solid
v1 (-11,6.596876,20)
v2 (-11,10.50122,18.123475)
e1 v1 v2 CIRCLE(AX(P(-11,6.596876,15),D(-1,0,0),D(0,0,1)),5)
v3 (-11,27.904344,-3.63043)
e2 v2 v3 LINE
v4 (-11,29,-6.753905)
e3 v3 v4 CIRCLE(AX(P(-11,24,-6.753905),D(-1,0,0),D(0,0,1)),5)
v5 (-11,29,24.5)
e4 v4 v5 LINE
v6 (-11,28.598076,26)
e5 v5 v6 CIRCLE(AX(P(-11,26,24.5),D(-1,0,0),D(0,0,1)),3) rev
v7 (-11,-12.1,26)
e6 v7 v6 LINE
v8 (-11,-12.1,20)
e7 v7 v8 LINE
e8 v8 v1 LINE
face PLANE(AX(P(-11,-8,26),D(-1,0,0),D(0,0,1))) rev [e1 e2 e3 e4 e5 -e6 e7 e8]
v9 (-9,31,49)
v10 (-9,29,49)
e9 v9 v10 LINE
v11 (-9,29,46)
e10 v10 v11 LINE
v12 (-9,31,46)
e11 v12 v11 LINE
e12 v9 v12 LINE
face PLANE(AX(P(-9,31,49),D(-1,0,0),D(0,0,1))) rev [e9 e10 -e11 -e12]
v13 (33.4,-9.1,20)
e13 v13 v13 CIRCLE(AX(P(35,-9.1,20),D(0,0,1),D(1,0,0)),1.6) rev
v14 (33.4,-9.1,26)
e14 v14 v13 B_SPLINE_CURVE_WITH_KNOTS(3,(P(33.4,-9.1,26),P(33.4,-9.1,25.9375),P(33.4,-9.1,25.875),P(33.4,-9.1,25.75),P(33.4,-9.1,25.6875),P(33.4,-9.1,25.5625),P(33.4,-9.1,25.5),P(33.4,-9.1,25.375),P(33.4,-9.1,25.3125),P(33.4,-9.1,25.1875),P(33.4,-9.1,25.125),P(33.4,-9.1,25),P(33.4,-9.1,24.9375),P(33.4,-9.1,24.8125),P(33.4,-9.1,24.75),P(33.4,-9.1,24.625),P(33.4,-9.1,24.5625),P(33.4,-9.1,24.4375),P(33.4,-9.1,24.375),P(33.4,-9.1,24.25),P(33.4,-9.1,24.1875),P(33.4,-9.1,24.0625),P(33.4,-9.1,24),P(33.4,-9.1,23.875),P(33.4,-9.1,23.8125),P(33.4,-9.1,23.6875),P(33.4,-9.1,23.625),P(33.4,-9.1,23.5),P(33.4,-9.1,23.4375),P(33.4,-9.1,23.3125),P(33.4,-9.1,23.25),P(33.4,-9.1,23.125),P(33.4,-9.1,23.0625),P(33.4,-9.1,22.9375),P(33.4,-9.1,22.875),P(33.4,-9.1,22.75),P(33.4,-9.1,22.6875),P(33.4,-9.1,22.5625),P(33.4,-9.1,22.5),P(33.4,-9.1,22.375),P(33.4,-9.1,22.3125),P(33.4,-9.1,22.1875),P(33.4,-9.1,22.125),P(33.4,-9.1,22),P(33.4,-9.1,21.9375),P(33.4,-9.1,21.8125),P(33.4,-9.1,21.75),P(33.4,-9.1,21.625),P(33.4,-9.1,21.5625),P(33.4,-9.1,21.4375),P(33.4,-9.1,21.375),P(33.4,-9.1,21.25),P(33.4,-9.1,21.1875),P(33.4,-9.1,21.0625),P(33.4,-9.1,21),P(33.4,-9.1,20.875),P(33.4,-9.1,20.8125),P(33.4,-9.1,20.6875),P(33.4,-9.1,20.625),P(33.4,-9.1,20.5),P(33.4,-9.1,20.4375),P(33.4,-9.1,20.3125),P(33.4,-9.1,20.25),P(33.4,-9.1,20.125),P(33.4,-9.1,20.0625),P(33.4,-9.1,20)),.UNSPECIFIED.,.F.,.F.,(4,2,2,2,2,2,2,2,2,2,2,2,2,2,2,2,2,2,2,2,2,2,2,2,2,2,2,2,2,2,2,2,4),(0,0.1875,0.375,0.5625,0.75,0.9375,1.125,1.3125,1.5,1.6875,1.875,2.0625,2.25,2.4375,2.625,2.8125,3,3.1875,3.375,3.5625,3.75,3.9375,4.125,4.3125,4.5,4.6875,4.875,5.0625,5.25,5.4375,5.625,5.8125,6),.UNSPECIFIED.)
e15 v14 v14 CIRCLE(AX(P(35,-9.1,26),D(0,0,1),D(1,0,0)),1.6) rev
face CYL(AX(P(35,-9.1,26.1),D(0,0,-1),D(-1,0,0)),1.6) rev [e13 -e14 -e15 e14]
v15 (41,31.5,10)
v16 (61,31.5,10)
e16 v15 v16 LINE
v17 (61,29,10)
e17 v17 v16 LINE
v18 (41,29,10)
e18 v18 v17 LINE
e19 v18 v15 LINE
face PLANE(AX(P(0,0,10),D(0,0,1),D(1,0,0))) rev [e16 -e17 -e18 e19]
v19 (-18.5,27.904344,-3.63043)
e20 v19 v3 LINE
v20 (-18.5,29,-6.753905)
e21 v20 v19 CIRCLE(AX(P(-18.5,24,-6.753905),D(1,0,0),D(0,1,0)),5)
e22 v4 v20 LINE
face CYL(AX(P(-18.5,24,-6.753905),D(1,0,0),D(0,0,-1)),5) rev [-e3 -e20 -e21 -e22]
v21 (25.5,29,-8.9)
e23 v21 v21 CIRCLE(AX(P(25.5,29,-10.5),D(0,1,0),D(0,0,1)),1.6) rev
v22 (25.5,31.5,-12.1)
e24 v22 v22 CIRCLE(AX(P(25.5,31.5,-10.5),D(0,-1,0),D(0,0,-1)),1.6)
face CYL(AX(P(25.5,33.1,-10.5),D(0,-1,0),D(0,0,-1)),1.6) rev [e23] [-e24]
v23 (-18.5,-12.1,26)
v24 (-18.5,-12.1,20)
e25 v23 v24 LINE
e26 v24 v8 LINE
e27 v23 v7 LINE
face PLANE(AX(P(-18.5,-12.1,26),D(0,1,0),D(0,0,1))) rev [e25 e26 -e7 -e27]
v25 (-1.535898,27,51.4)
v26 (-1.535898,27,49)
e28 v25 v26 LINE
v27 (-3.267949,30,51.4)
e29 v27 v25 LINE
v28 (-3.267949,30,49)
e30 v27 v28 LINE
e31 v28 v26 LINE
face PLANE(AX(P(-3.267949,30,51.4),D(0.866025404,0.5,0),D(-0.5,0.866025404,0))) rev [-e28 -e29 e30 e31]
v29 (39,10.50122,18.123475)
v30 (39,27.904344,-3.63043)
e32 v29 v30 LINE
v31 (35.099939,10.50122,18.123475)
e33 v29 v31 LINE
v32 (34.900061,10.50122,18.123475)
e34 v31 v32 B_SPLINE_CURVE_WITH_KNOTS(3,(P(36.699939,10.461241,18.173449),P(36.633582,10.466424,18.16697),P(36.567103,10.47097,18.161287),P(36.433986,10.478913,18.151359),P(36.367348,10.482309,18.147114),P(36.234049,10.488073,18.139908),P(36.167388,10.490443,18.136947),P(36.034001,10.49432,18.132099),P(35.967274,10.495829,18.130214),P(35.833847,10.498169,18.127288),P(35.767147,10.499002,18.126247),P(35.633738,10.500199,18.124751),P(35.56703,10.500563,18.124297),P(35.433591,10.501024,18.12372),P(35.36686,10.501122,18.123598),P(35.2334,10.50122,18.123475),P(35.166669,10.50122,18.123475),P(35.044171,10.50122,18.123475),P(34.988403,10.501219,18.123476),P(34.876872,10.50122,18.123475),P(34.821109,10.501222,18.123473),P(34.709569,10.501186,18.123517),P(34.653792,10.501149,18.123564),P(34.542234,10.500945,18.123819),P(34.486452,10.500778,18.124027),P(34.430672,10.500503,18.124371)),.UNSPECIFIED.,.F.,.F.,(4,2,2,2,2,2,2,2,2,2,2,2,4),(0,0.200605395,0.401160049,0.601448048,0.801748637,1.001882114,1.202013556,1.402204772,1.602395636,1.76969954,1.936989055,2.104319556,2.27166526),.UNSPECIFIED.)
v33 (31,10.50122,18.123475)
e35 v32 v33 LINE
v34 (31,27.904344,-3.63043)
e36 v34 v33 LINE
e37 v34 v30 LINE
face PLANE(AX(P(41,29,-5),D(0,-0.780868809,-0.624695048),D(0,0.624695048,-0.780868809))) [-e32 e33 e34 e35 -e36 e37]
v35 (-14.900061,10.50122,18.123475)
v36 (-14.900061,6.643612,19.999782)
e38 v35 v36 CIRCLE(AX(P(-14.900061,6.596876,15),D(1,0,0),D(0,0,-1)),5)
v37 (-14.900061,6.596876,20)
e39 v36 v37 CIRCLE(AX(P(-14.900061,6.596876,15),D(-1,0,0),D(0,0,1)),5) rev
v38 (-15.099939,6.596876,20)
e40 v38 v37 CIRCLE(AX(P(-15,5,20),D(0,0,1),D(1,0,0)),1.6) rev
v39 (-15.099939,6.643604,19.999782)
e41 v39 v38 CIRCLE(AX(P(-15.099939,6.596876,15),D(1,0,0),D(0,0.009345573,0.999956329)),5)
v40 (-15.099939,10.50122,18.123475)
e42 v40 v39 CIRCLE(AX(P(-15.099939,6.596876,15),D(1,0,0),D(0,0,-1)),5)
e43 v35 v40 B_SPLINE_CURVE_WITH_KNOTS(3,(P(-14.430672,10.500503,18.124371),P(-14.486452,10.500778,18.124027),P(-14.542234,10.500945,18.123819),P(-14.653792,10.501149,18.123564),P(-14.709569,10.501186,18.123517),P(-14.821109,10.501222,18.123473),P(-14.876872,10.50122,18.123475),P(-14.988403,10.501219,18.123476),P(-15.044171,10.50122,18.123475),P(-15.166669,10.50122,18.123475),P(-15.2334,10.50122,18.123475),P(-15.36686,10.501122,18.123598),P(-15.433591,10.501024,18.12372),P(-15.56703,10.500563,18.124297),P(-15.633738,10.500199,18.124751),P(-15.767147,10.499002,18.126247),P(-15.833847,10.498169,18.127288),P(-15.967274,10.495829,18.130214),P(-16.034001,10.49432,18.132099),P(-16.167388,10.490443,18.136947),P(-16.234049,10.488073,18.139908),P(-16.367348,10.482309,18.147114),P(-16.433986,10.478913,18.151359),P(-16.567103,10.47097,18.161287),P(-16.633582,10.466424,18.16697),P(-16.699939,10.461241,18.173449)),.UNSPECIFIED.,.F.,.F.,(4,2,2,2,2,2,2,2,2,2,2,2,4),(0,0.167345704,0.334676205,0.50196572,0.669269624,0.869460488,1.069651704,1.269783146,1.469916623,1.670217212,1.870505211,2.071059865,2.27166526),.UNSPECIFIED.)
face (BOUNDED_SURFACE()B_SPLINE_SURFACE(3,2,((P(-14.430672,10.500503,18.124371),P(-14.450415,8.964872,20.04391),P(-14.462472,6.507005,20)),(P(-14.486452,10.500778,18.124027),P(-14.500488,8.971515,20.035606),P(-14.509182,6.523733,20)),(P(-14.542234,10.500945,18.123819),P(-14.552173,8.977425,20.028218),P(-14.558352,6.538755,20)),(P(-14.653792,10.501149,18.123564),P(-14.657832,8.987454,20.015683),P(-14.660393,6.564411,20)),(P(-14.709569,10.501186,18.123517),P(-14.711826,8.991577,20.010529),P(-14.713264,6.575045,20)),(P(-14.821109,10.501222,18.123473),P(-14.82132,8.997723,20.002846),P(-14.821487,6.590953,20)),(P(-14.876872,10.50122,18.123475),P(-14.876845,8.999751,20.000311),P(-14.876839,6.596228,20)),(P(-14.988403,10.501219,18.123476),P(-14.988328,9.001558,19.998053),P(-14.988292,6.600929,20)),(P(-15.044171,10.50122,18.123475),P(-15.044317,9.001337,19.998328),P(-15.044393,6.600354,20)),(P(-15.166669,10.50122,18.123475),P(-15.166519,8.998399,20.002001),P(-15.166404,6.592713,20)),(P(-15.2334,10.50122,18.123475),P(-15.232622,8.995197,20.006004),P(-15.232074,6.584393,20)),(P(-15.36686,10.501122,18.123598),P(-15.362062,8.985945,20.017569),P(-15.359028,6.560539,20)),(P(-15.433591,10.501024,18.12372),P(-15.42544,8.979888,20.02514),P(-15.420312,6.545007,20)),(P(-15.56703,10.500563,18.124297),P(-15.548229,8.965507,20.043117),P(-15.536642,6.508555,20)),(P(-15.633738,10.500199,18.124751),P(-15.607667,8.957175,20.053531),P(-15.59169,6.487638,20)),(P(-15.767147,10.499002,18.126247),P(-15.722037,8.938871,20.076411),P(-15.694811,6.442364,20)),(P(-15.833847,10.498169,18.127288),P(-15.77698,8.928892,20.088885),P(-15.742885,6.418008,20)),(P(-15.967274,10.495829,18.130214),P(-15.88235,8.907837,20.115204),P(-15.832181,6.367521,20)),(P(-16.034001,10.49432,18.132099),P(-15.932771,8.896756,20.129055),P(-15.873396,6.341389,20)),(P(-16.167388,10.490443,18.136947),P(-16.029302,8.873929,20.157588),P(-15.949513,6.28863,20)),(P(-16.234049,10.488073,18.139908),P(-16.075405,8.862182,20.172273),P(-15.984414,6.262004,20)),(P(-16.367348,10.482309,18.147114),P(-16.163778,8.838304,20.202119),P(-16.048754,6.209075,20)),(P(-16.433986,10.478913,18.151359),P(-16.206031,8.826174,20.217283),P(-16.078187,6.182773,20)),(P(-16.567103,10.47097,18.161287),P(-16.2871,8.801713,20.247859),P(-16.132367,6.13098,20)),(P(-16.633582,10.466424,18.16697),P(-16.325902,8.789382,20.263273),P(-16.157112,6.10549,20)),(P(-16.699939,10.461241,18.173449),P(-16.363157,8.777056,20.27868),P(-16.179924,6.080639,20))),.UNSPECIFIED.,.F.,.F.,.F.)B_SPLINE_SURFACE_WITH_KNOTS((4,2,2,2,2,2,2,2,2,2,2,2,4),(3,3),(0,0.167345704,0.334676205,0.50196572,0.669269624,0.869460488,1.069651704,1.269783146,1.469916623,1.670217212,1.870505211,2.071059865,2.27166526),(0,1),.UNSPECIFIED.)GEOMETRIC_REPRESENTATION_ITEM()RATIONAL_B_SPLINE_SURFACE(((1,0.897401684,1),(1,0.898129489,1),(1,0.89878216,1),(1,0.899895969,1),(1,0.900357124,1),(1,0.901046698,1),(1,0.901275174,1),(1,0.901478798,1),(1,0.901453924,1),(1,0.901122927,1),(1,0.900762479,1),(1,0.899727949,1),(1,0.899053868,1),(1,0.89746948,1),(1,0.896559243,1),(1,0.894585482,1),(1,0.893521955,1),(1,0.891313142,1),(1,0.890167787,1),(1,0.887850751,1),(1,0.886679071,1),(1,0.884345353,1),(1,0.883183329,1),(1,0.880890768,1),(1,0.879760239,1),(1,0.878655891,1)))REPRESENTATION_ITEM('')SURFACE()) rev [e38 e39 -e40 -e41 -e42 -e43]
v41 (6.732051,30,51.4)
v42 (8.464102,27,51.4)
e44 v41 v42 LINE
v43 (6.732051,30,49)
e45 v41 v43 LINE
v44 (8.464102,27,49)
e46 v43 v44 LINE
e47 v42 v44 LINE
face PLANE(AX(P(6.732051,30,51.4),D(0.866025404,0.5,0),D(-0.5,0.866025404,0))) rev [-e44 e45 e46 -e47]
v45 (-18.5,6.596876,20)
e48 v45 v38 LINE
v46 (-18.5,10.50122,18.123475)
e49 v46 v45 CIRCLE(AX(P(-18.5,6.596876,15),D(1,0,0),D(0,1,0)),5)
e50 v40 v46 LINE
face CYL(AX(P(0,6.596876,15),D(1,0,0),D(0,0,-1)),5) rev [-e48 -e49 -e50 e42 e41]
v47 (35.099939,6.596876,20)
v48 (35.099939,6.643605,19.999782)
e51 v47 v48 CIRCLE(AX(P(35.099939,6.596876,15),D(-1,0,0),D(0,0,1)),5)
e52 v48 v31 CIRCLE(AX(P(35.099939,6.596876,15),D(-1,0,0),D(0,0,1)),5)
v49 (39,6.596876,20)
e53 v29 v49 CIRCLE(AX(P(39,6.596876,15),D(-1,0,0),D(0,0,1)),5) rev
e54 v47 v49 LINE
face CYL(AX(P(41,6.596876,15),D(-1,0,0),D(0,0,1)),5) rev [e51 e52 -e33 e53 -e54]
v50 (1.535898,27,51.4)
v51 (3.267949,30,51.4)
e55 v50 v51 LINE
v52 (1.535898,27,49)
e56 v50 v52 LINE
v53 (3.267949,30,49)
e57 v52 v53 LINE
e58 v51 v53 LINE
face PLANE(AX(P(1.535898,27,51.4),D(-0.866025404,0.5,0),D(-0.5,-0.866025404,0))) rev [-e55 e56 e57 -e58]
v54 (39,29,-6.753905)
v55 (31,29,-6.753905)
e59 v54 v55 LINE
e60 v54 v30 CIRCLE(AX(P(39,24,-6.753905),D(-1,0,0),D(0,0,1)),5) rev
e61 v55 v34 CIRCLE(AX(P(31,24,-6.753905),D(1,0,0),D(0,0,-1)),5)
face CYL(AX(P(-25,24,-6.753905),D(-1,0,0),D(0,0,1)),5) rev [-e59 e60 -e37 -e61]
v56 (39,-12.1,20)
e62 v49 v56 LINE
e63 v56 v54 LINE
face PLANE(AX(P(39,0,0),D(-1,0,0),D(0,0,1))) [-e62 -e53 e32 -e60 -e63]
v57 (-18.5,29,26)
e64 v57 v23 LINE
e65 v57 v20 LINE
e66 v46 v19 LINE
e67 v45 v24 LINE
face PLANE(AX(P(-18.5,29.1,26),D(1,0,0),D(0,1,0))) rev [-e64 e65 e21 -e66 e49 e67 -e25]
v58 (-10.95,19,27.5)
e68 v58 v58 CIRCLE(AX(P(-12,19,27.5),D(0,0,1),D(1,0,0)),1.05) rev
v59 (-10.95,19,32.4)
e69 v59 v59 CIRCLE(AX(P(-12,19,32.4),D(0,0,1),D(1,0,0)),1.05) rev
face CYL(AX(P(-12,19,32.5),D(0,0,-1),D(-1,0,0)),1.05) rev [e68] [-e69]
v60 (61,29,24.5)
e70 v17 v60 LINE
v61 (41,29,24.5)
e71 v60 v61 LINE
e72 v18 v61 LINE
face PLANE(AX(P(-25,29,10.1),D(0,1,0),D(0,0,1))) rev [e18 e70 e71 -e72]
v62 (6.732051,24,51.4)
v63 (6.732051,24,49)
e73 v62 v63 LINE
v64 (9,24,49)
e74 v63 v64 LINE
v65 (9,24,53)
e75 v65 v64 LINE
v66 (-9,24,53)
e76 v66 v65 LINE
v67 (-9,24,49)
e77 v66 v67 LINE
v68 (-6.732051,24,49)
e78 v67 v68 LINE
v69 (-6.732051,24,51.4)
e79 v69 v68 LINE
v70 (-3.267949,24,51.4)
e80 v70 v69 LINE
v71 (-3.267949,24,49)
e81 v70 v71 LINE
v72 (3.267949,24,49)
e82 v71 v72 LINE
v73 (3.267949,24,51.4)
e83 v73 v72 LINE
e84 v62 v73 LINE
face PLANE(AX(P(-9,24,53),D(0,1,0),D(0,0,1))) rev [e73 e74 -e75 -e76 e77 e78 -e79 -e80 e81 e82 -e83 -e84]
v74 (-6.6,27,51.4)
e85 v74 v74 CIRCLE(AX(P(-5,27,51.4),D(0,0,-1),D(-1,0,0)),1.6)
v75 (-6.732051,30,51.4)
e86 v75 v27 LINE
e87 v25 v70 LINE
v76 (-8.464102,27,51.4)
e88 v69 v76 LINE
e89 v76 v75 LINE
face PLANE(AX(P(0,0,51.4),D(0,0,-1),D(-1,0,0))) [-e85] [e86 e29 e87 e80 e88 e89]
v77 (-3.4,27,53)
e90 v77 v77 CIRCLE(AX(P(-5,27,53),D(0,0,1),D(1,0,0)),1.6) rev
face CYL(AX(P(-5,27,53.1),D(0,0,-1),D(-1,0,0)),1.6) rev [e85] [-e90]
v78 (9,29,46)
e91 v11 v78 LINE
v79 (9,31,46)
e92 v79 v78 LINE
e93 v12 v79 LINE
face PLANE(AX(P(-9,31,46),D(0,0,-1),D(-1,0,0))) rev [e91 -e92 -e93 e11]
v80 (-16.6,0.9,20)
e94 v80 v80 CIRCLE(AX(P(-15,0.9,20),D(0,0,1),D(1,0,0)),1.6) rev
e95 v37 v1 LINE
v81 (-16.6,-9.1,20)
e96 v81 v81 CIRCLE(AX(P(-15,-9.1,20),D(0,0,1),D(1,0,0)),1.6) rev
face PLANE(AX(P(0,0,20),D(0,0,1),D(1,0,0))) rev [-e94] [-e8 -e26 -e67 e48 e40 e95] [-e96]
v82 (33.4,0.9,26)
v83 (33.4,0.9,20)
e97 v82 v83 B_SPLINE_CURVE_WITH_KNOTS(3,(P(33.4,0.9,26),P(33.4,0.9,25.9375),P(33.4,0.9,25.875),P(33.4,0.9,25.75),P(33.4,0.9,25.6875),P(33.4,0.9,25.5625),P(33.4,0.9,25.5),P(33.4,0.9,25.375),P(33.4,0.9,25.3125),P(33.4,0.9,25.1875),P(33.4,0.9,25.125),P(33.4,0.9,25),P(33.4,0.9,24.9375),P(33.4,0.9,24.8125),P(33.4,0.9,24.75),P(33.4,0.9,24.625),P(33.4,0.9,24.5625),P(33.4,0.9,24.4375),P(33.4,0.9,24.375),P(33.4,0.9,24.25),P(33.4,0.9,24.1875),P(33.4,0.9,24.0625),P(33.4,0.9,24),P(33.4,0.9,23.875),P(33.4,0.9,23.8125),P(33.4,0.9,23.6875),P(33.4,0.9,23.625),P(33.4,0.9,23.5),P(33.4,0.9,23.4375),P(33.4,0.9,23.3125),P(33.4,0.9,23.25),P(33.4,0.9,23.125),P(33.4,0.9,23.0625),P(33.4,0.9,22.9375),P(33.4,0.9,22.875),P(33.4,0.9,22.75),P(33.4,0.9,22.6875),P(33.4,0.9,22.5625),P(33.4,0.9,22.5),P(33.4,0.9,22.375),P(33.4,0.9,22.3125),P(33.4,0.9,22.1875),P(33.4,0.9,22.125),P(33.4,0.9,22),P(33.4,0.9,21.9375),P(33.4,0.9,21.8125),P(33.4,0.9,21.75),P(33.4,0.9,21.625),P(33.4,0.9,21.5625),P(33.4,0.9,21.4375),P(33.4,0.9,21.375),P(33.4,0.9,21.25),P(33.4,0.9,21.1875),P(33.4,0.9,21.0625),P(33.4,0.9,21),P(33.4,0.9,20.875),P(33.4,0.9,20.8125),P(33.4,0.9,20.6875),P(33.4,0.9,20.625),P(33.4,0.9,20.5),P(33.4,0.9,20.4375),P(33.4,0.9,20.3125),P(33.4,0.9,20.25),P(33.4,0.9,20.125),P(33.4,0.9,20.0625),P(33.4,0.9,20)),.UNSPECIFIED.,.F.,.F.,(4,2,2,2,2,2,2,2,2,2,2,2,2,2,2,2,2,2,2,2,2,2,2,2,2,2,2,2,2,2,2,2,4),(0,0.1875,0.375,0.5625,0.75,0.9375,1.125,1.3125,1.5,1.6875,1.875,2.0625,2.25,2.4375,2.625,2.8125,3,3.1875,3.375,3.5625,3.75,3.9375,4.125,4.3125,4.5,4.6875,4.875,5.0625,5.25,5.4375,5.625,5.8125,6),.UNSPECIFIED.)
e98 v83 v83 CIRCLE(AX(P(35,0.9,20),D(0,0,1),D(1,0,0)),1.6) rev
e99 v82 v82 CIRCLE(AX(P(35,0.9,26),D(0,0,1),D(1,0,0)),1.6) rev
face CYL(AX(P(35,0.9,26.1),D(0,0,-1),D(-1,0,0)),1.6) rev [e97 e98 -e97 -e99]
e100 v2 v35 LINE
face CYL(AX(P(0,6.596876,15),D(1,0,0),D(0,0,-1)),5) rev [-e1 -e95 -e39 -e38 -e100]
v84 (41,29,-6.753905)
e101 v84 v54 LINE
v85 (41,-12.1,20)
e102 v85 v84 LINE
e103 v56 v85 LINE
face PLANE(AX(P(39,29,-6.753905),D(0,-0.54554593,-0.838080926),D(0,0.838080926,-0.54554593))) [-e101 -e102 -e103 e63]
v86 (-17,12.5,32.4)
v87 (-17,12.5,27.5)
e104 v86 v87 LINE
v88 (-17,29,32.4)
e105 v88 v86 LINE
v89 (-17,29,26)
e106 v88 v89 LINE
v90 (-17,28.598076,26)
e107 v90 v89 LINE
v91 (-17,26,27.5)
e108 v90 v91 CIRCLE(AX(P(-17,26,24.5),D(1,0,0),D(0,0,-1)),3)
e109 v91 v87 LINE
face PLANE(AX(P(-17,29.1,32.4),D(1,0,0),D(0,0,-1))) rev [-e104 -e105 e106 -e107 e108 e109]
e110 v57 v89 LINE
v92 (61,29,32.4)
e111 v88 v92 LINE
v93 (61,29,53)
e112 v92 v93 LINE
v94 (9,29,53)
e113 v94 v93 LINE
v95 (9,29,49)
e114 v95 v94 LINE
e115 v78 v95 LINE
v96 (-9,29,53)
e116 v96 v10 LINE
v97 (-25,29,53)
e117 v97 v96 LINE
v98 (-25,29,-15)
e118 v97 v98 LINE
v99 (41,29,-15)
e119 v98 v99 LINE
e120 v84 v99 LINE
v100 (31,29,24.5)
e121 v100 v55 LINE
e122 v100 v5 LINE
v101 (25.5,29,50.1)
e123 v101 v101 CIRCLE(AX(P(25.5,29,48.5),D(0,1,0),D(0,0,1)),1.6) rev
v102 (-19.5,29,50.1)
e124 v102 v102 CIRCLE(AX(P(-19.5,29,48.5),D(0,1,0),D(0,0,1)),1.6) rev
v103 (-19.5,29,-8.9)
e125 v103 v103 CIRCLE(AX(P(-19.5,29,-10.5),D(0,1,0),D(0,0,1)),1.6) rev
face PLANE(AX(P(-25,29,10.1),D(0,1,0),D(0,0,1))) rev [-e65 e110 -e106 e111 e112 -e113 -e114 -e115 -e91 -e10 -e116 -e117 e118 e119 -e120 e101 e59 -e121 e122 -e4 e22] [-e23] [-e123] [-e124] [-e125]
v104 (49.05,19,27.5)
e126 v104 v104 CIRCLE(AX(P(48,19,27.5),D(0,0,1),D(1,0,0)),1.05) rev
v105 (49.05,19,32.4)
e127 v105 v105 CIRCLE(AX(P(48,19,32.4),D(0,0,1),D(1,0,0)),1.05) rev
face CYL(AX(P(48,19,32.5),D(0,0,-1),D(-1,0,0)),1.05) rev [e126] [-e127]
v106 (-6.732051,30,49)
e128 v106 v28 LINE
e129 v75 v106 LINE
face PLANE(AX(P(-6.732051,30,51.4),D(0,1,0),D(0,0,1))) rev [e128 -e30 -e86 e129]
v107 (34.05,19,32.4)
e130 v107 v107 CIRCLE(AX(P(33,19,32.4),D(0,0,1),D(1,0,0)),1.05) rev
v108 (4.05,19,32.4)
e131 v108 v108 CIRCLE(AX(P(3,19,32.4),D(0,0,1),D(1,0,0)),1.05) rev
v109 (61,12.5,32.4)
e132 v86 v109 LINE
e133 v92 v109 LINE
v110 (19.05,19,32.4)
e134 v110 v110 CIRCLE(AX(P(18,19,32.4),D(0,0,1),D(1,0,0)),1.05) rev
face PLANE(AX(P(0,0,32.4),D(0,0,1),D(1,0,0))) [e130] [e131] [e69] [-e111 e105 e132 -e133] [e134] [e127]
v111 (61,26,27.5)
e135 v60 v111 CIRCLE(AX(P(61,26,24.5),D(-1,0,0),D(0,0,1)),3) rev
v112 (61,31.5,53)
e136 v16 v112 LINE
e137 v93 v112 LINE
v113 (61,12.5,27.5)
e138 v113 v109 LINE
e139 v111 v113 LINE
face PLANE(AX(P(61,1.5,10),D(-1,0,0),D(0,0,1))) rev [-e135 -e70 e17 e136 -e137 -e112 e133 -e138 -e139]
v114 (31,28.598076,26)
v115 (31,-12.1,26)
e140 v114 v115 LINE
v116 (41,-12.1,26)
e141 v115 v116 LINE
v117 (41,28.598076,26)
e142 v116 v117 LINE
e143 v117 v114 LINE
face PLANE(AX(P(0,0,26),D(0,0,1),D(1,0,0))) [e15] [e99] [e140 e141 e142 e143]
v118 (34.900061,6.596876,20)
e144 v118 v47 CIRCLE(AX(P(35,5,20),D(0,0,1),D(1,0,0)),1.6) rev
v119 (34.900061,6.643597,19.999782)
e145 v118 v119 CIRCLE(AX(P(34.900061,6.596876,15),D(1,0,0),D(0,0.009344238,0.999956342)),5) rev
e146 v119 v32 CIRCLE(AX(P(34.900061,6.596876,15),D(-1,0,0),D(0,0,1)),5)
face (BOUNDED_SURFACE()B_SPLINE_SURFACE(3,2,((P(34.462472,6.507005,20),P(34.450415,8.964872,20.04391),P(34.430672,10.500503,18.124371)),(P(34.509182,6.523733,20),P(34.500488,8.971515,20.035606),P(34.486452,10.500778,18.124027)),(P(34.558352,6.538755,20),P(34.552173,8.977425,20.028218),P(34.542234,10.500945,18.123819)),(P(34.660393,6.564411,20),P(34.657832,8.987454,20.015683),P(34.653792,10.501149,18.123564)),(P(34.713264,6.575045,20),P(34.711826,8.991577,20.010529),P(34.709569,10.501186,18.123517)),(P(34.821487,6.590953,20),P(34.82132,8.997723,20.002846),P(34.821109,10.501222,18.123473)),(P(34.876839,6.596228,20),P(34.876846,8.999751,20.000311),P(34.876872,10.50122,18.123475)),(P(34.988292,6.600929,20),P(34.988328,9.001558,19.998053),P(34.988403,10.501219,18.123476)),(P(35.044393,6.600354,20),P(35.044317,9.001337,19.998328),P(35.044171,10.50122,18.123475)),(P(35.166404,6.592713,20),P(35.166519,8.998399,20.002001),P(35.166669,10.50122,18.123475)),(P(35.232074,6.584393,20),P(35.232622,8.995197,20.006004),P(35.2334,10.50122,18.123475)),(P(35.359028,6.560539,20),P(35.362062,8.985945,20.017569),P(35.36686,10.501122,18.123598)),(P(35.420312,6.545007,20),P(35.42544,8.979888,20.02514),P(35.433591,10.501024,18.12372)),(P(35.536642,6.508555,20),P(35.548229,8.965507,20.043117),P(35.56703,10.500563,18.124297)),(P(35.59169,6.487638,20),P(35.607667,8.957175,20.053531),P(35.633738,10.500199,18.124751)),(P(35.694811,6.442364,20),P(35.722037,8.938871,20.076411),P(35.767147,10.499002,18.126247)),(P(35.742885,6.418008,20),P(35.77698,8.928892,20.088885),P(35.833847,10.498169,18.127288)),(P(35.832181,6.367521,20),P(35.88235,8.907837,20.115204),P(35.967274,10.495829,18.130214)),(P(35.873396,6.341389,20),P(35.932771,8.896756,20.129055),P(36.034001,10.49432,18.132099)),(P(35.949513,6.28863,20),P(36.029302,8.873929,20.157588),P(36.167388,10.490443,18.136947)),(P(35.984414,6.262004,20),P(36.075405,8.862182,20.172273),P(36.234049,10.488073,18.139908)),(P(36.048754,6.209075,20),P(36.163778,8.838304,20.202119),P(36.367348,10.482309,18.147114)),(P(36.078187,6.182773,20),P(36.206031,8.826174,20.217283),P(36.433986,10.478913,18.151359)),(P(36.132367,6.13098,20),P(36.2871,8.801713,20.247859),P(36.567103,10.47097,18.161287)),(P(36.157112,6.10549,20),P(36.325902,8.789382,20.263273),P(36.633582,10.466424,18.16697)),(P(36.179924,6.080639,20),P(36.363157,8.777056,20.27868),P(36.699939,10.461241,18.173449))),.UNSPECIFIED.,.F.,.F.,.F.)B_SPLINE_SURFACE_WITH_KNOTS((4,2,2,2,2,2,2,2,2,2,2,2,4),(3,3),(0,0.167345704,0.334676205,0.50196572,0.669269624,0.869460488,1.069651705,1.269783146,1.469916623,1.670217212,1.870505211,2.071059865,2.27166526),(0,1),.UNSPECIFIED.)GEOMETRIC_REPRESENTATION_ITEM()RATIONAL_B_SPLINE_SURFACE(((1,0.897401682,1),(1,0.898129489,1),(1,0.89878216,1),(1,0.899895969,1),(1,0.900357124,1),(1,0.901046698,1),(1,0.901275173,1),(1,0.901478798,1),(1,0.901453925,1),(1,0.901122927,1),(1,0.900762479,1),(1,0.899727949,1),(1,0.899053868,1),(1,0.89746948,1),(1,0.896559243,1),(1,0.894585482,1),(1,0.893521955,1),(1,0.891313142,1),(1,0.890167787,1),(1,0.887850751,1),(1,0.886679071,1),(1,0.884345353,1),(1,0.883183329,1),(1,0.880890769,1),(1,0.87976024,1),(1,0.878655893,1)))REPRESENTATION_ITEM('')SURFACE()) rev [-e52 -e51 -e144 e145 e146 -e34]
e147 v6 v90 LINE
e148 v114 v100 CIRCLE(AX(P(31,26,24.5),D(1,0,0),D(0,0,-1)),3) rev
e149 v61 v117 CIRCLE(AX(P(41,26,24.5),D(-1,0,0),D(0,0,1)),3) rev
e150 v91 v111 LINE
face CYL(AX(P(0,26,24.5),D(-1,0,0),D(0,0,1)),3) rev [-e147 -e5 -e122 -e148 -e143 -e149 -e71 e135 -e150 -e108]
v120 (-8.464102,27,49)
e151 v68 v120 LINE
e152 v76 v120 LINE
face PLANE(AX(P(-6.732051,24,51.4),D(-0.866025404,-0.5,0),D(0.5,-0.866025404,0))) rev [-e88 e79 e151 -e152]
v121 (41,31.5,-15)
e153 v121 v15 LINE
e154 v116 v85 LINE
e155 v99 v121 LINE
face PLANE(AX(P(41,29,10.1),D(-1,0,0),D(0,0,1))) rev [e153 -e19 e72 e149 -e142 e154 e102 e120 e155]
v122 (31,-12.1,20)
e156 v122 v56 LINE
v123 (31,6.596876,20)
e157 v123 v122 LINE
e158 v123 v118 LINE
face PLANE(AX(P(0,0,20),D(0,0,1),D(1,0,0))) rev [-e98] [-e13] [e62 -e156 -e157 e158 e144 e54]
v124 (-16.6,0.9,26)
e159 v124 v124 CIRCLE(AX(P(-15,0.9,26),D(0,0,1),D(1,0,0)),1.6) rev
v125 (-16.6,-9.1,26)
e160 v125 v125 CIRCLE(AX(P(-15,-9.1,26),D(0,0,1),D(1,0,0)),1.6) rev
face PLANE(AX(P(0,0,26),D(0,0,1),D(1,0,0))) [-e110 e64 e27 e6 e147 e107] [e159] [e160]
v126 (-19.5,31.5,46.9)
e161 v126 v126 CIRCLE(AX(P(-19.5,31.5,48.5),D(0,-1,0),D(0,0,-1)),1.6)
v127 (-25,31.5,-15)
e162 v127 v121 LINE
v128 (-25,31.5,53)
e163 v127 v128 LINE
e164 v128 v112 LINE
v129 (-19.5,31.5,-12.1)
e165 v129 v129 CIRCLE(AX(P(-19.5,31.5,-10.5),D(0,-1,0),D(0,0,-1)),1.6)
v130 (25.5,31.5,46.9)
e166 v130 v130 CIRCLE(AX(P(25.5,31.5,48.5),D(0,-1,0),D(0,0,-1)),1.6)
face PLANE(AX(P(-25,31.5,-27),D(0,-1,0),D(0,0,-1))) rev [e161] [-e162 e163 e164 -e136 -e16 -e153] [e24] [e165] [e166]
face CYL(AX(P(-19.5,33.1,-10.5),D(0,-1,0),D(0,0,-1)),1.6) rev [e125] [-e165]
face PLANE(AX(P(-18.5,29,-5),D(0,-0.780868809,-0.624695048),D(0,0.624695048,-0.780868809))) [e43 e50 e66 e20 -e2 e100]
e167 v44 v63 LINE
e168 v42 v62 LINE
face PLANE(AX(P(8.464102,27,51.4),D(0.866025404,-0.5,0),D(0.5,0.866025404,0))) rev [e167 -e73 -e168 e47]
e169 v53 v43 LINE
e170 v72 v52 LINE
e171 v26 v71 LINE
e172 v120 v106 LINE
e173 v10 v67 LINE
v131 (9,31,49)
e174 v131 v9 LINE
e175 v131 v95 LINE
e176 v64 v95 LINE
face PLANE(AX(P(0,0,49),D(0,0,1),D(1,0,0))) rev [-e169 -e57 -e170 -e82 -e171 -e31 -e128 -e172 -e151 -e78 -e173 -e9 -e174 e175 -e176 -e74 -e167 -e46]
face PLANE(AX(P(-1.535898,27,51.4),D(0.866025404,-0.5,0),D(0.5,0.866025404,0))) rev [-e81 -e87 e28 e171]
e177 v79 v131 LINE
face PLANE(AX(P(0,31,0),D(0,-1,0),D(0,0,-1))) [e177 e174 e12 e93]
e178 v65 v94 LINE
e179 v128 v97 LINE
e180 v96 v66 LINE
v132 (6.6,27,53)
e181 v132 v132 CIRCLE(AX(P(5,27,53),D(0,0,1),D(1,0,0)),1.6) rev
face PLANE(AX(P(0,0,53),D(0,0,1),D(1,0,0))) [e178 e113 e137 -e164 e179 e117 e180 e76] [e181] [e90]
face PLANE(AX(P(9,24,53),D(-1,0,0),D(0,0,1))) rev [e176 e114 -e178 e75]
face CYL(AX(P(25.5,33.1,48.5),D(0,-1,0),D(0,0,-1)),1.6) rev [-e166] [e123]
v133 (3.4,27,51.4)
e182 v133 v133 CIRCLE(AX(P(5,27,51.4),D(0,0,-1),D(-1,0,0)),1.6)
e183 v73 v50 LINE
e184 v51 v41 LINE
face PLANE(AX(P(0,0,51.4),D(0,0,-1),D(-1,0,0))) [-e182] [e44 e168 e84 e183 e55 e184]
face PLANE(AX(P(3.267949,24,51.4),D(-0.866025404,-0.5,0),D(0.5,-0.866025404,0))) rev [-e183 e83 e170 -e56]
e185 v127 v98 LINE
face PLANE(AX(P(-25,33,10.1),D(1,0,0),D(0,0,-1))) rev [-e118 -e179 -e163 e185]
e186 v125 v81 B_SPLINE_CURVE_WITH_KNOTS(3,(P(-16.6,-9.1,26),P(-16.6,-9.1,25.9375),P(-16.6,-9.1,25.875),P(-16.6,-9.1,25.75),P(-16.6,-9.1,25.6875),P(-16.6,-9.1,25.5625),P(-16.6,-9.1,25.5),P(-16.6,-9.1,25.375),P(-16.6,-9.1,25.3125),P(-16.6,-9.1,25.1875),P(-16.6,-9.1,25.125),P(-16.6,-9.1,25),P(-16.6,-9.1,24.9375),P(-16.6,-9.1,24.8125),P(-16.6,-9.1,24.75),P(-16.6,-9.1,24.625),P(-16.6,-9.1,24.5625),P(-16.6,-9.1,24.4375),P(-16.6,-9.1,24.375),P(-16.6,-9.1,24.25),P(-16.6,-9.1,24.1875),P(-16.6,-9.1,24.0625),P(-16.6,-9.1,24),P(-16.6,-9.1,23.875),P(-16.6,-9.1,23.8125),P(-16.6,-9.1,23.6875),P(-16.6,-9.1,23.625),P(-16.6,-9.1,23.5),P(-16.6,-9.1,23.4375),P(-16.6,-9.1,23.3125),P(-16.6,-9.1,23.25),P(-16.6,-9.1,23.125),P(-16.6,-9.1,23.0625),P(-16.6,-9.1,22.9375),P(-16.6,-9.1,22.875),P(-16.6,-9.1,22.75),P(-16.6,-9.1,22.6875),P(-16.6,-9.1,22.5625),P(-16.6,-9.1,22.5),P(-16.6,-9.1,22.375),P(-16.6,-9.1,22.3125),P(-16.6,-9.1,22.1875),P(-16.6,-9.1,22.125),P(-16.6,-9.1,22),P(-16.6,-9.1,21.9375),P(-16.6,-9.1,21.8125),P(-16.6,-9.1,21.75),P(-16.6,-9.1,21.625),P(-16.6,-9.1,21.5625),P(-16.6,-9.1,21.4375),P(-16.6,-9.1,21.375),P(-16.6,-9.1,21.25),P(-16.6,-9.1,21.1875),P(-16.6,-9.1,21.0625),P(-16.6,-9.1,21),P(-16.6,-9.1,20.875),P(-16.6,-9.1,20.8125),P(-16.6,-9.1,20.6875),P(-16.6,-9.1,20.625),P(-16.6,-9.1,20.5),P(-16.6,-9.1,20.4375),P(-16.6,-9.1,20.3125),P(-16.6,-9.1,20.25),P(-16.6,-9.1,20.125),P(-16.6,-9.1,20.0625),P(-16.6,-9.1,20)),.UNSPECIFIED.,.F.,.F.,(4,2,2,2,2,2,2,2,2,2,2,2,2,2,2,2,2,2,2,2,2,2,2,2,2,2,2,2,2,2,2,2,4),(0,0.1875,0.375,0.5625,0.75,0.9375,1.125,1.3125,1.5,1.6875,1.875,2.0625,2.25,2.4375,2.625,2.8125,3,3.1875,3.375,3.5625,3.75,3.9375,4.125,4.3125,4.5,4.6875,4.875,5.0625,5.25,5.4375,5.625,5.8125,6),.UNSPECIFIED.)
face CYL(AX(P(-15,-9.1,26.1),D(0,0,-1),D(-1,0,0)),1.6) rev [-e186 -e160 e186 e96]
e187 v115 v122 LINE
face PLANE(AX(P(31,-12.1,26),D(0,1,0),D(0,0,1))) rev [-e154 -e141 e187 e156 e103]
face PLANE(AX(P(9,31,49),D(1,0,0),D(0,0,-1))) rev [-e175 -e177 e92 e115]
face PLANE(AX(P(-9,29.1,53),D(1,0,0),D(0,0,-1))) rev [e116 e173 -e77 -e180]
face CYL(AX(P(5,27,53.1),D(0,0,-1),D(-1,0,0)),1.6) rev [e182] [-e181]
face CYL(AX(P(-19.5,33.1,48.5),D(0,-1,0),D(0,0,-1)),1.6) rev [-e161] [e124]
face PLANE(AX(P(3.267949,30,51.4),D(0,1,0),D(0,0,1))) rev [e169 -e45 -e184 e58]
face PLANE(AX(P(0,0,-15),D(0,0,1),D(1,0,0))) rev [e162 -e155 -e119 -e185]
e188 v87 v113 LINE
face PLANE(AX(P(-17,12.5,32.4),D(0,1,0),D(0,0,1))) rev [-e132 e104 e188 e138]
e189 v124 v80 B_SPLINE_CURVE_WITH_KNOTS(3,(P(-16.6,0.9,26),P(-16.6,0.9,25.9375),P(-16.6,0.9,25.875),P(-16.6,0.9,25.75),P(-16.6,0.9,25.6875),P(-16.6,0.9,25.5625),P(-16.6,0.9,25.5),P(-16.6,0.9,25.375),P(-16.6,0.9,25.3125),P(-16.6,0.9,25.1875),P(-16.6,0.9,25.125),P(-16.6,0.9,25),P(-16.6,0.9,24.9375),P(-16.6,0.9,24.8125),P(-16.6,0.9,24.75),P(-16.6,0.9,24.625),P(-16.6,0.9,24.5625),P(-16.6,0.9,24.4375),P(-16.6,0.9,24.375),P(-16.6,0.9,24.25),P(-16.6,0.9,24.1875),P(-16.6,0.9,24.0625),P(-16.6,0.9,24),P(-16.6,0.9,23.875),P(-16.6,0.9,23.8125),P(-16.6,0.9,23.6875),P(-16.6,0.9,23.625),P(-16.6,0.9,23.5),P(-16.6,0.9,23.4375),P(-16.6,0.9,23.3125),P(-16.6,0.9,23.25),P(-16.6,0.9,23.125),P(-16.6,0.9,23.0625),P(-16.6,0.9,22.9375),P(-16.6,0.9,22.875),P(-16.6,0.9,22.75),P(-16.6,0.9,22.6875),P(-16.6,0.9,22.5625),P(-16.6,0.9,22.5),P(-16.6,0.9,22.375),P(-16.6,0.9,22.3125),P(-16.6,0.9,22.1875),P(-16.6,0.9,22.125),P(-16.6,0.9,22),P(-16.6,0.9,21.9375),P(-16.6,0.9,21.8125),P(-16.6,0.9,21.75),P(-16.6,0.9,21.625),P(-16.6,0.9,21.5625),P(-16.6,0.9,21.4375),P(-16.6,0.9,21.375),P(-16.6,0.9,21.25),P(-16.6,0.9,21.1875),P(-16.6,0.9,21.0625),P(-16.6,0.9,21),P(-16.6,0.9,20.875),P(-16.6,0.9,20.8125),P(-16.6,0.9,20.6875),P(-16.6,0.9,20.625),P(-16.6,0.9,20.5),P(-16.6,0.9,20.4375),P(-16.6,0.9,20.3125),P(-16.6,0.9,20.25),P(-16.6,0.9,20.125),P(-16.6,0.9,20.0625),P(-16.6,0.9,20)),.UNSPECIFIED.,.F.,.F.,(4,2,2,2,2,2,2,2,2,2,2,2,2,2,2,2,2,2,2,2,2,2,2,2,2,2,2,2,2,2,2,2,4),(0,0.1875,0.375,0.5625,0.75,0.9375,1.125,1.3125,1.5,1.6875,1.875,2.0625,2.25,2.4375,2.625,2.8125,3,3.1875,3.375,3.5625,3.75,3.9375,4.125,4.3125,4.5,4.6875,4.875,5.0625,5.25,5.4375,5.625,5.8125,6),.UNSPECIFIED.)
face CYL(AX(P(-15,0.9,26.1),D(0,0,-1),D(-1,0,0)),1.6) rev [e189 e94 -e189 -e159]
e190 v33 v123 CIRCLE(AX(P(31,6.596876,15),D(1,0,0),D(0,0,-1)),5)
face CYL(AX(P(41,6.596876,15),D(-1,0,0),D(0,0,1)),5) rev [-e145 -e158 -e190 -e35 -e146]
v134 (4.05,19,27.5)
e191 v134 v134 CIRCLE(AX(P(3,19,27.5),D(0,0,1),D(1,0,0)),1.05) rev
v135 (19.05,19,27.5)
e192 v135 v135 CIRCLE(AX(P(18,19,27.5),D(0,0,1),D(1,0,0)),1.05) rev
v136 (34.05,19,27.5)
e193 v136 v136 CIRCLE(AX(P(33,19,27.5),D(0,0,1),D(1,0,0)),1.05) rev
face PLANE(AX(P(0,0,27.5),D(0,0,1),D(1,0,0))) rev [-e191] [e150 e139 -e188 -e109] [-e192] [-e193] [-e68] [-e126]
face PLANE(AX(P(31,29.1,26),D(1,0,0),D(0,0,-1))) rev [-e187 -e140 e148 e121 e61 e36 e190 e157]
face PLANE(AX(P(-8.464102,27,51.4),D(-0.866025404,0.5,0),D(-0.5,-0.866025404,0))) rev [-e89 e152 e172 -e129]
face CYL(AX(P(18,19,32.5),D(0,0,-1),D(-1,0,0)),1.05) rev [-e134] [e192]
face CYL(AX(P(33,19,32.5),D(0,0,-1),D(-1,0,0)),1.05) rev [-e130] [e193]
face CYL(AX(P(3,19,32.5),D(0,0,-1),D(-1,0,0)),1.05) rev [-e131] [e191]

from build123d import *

# Parameters (mm, degrees)
ORTHOGONAL_START                              = -15
ORTHOGONAL_CHASSIS_PLATE_PRIMARY_PROFILE_W    = 66
ORTHOGONAL_CHASSIS_PLATE_PRIMARY_PROFILE_H    = 4
ORTHOGONAL_CHASSIS_PLATE_PRIMARY_DEPTH        = 25.1
ORTHOGONAL_START_2                            = 10
ORTHOGONAL_CHASSIS_PLATE_GUIDE_SIDE_PROF_W    = 109
ORTHOGONAL_CHASSIS_PLATE_GUIDE_SIDE_PROF_H    = 4
ORTHOGONAL_CHASSIS_PLATE_GUIDE_SIDE_DEPTH     = 43
HORIZONTAL_START                              = 20
HORIZONTAL_SERVO_SEAT_UPRIGHTS_PROFILE_W      = 7.5
HORIZONTAL_SERVO_SEAT_UPRIGHTS_PROFILE_H      = 37.1
HORIZONTAL_SERVO_SEAT_UPRIGHTS_PROFILE_W_2    = 10
HORIZONTAL_SERVO_SEAT_UPRIGHTS_DEPTH          = 6
SIDE_START                                    = 27.5
SIDE_MOUNTING_FACE_FOR_MGN7_RAIL_PROFILE_W    = 100
SIDE_MOUNTING_FACE_FOR_MGN7_RAIL_PROFILE_H    = 16.6
SIDE_MOUNTING_FACE_FOR_MGN7_RAIL_DEPTH        = 4.9
HORIZONTAL_START_2                            = 49
HORIZONTAL_LIMIT_BRACKET_FOOT_SUPPORT_PR_W    = 18
HORIZONTAL_LIMIT_BRACKET_FOOT_SUPPORT_PR_H    = 5.1
HORIZONTAL_LIMIT_BRACKET_FOOT_SUPPORT_DEPTH   = 4
CHASSIS_START                                 = 28.9
CHASSIS_MOUNTING_HOLE_LAYOUT_45_X_41_2_R      = 1.6
CHASSIS_MOUNTING_HOLE_LAYOUT_45_X_41_MM_DEPTH = 4.2
SERVO_START                                   = 19.9
SERVO_MOUNT_50_X_10_MM_PITCH_PROFILE_R        = 1.6
SERVO_MOUNT_50_X_10_MM_PITCH_DEPTH            = 6.2
GUIDE_START                                   = 27.45
GUIDE_M2_MOUNTING_PILOTS_15_MM_PITCH_PRO_R    = 1.05
GUIDE_M2_MOUNTING_PILOTS_15_MM_PITCH_DEPTH    = 5.05
STOP_START                                    = 48.9
STOP_MOUNTING_TWO_M3_PILOTS_10_MM_PI_2_R      = 1.6
STOP_MOUNTING_TWO_M3_PILOTS_10_MM_PITCH_DEPTH = 4.2
FILLET_2_R                                    = 3
SKETCH_3_W                                    = 18
SKETCH_3_H                                    = 3
CUT_EXTRUDE_1_DEPTH                           = 2
CUT_EXTRUDE_2_DEPTH                           = 2.4
EXTRUDE_3_DEPTH                               = 7.5
EXTRUDE_4_DEPTH                               = 10
FILLET_3_R                                    = 5
SKETCH_7_W                                    = 109
SKETCH_7_H                                    = 1.5
CUT_EXTRUDE_3_DEPTH                           = 80
SKETCH_8_W                                    = 23
SKETCH_8_H                                    = 43
CUT_EXTRUDE_4_DEPTH                           = 30
RAISE_START                                   = 20
RAISE_SERVO_MOUNTING_TABS_BY_4_10_MM_PRO_W    = 7.5
RAISE_SERVO_MOUNTING_TABS_BY_4_10_MM_PRO_H    = 5.1
RAISE_SERVO_MOUNTING_TABS_BY_4_10_MM_PRO_W_2  = 10
RAISE_SERVO_MOUNTING_TABS_BY_4_10_MM_DEPTH    = 6
FILL_START                                    = 20
FILL_ORIGINAL_SERVO_HOLES_PROFILE_R           = 1.65
FILL_ORIGINAL_SERVO_HOLES_DEPTH               = 6
SERVO_MOUNTING_HOLES_RAISED_4_10_MM_PROF_R    = 1.6
SERVO_MOUNTING_HOLES_RAISED_4_10_MM_DEPTH     = 6.2
EXTRUDE_5_DEPTH                               = 2


with BuildPart() as part:
    # Orthogonal chassis plate primary profile → Orthogonal chassis plate primary (new body)
    with BuildSketch(Plane.XY.offset(ORTHOGONAL_START)):
        with Locations((8, 31)):
            Rectangle(ORTHOGONAL_CHASSIS_PLATE_PRIMARY_PROFILE_W, ORTHOGONAL_CHASSIS_PLATE_PRIMARY_PROFILE_H)
    extrude(amount=ORTHOGONAL_CHASSIS_PLATE_PRIMARY_DEPTH)

    # Orthogonal chassis plate guide side profile → Orthogonal chassis plate guide side (add)
    with BuildSketch(Plane.XY.offset(ORTHOGONAL_START_2)):
        with Locations((29.5, 31)):
            Rectangle(ORTHOGONAL_CHASSIS_PLATE_GUIDE_SIDE_PROF_W, ORTHOGONAL_CHASSIS_PLATE_GUIDE_SIDE_PROF_H)
    extrude(amount=ORTHOGONAL_CHASSIS_PLATE_GUIDE_SIDE_DEPTH)

    # Horizontal servo seat uprights profile → Horizontal servo seat uprights (add)
    with BuildSketch(Plane.XY.offset(HORIZONTAL_START)):
        with Locations((-14.75, 10.55)):
            Rectangle(HORIZONTAL_SERVO_SEAT_UPRIGHTS_PROFILE_W, HORIZONTAL_SERVO_SEAT_UPRIGHTS_PROFILE_H)
        with Locations((36, 10.55)):
            Rectangle(HORIZONTAL_SERVO_SEAT_UPRIGHTS_PROFILE_W_2, HORIZONTAL_SERVO_SEAT_UPRIGHTS_PROFILE_H)
    extrude(amount=HORIZONTAL_SERVO_SEAT_UPRIGHTS_DEPTH)

    # Side mounting face for MGN7 rail profile → Side mounting face for MGN7 rail (add)
    with BuildSketch(Plane.XY.offset(SIDE_START)):
        with Locations((33, 20.8)):
            Rectangle(SIDE_MOUNTING_FACE_FOR_MGN7_RAIL_PROFILE_W, SIDE_MOUNTING_FACE_FOR_MGN7_RAIL_PROFILE_H)
    extrude(amount=SIDE_MOUNTING_FACE_FOR_MGN7_RAIL_DEPTH)

    # Horizontal limit bracket foot support profile → Horizontal limit bracket foot support (add)
    with BuildSketch(Plane.XY.offset(HORIZONTAL_START_2)):
        with Locations((0, 26.55)):
            Rectangle(HORIZONTAL_LIMIT_BRACKET_FOOT_SUPPORT_PR_W, HORIZONTAL_LIMIT_BRACKET_FOOT_SUPPORT_PR_H)
    extrude(amount=HORIZONTAL_LIMIT_BRACKET_FOOT_SUPPORT_DEPTH)

    # Chassis mounting hole layout 45 x 41 2 → Chassis mounting hole layout 45 x 41 mm (cut)
    with BuildSketch(Plane(origin=(0, 0, 0), x_dir=(1, 0, 0), z_dir=(0, 1, 0)).offset(CHASSIS_START)):
        with Locations(Location((-19.5, 10.5, 0), (0, 0, 90))):
            Circle(CHASSIS_MOUNTING_HOLE_LAYOUT_45_X_41_2_R)
        with Locations(Location((-19.5, -48.5, 0), (0, 0, 90))):
            Circle(CHASSIS_MOUNTING_HOLE_LAYOUT_45_X_41_2_R)
        with Locations(Location((25.5, 10.5, 0), (0, 0, 90))):
            Circle(CHASSIS_MOUNTING_HOLE_LAYOUT_45_X_41_2_R)
        with Locations(Location((25.5, -48.5, 0), (0, 0, 90))):
            Circle(CHASSIS_MOUNTING_HOLE_LAYOUT_45_X_41_2_R)
        with Locations(Location((70.5, -48.5, 0), (0, 0, 90))):
            Circle(CHASSIS_MOUNTING_HOLE_LAYOUT_45_X_41_2_R)
    extrude(amount=CHASSIS_MOUNTING_HOLE_LAYOUT_45_X_41_MM_DEPTH, mode=Mode.SUBTRACT)

    # Servo mount 50 x 10 mm pitch profile → Servo mount 50 x 10 mm pitch (cut)
    with BuildSketch(Plane.XY.offset(SERVO_START)):
        with Locations(Location((-15, -5, 0), (0, 0, 180))):
            Circle(SERVO_MOUNT_50_X_10_MM_PITCH_PROFILE_R)
        with Locations(Location((-15, 5, 0), (0, 0, 180))):
            Circle(SERVO_MOUNT_50_X_10_MM_PITCH_PROFILE_R)
        with Locations(Location((35, -5, 0), (0, 0, 180))):
            Circle(SERVO_MOUNT_50_X_10_MM_PITCH_PROFILE_R)
        with Locations(Location((35, 5, 0), (0, 0, 180))):
            Circle(SERVO_MOUNT_50_X_10_MM_PITCH_PROFILE_R)
    extrude(amount=SERVO_MOUNT_50_X_10_MM_PITCH_DEPTH, mode=Mode.SUBTRACT)

    # Guide M2 mounting pilots 15 mm pitch profile → Guide M2 mounting pilots 15 mm pitch (cut)
    with BuildSketch(Plane.XY.offset(GUIDE_START)):
        with Locations((-12, 19)):
            Circle(GUIDE_M2_MOUNTING_PILOTS_15_MM_PITCH_PRO_R)
        with Locations((3, 19)):
            Circle(GUIDE_M2_MOUNTING_PILOTS_15_MM_PITCH_PRO_R)
        with Locations((18, 19)):
            Circle(GUIDE_M2_MOUNTING_PILOTS_15_MM_PITCH_PRO_R)
        with Locations((33, 19)):
            Circle(GUIDE_M2_MOUNTING_PILOTS_15_MM_PITCH_PRO_R)
        with Locations((48, 19)):
            Circle(GUIDE_M2_MOUNTING_PILOTS_15_MM_PITCH_PRO_R)
        with Locations((63, 19)):
            Circle(GUIDE_M2_MOUNTING_PILOTS_15_MM_PITCH_PRO_R)
        with Locations((78, 19)):
            Circle(GUIDE_M2_MOUNTING_PILOTS_15_MM_PITCH_PRO_R)
    extrude(amount=GUIDE_M2_MOUNTING_PILOTS_15_MM_PITCH_DEPTH, mode=Mode.SUBTRACT)

    # Stop mounting two M3 pilots 10 mm pi 2 → Stop mounting two M3 pilots 10 mm pitch (cut)
    with BuildSketch(Plane.XY.offset(STOP_START)):
        with Locations((-5, 27)):
            Circle(STOP_MOUNTING_TWO_M3_PILOTS_10_MM_PI_2_R)
        with Locations((5, 27)):
            Circle(STOP_MOUNTING_TWO_M3_PILOTS_10_MM_PI_2_R)
    extrude(amount=STOP_MOUNTING_TWO_M3_PILOTS_10_MM_PITCH_DEPTH, mode=Mode.SUBTRACT)

    # 圆角2
    # the kernel refuses this fillet: 3 mm, written as the material it adds along each edge
    with BuildSketch(Plane(origin=(-17, 29, 27.5), x_dir=(0, 0, -1), z_dir=(1, 0, 0))) as fillet_2_piece_1:
        with BuildLine():
            CenterArc((FILLET_2_R, -FILLET_2_R), FILLET_2_R, 90, 90)
            Line((0, -FILLET_2_R), (0, 0))
            Line((0, 0), (FILLET_2_R, 0))
        make_face()
    extrude(amount=100)

    # 草图3 → 切除-拉伸1 (cut)
    with BuildSketch(Plane(origin=(0, 29, 0), x_dir=(-1, 0, 0), z_dir=(0, -1, 0))):
        with Locations((0, -47.5)):
            Rectangle(SKETCH_3_W, SKETCH_3_H)
    extrude(amount=-CUT_EXTRUDE_1_DEPTH, mode=Mode.SUBTRACT)

    # 草图4 → 切除-拉伸2 (cut)
    with BuildSketch(Plane(origin=(0, 0, 49), x_dir=(-1, 0, 0), z_dir=(0, 0, -1))):
        Polygon((-3.267949192, 30), (-6.732050808, 30), (-8.464101615, 27), (-6.732050808, 24), (-3.267949192, 24), (-1.535898385, 27), align=None)
        Polygon((6.732050808, 30), (3.267949192, 30), (1.535898385, 27), (3.267949192, 24), (6.732050808, 24), (8.464101615, 27), align=None)
    extrude(amount=-CUT_EXTRUDE_2_DEPTH, mode=Mode.SUBTRACT)

    # 草图5 → 凸台-拉伸3 (add)
    with BuildSketch(Plane(origin=(-11, 0, 0), x_dir=(0, 0, -1), z_dir=(1, 0, 0))):
        Polygon((-20, 29), (5, 29), (-20, 9), align=None)
    extrude(amount=-EXTRUDE_3_DEPTH)

    # 草图6 → 凸台-拉伸4 (add)
    with BuildSketch(Plane.ZY.offset(-31)):
        Polygon((20, 29), (-5, 29), (20, 9), align=None)
    extrude(amount=-EXTRUDE_4_DEPTH)

    # 圆角3
    fillet_3_edges = [part.edges().sort_by_distance(p)[0] for p in [
        (-14.75, 9, 20),
        (-14.75, 29, -5),
        (36, 9, 20),
        (36, 29, -5),
    ]]
    fillet(fillet_3_edges, radius=FILLET_3_R)

    # 草图7 → 切除-拉伸3 (cut)
    with BuildSketch(Plane.XY.offset(53)):
        with Locations((29.5, 32.25)):
            Rectangle(SKETCH_7_W, SKETCH_7_H)
    extrude(amount=-CUT_EXTRUDE_3_DEPTH, mode=Mode.SUBTRACT)

    # 草图8 → 切除-拉伸4 (cut)
    with BuildSketch(Plane(origin=(0, 31.5, 0), x_dir=(1, 0, 0), z_dir=(0, 1, 0))):
        with Locations((72.5, -31.5)):
            Rectangle(SKETCH_8_W, SKETCH_8_H)
    extrude(amount=-CUT_EXTRUDE_4_DEPTH, mode=Mode.SUBTRACT)

    # Raise servo mounting tabs by 4.10 mm profile → Raise servo mounting tabs by 4.10 mm (add)
    with BuildSketch(Plane.XY.offset(RAISE_START)):
        with Locations((-14.75, -9.55)):
            Rectangle(RAISE_SERVO_MOUNTING_TABS_BY_4_10_MM_PRO_W, RAISE_SERVO_MOUNTING_TABS_BY_4_10_MM_PRO_H)
        with Locations((36, -9.55)):
            Rectangle(RAISE_SERVO_MOUNTING_TABS_BY_4_10_MM_PRO_W_2, RAISE_SERVO_MOUNTING_TABS_BY_4_10_MM_PRO_H)
    extrude(amount=RAISE_SERVO_MOUNTING_TABS_BY_4_10_MM_DEPTH)

    # Fill original servo holes profile → Fill original servo holes (add)
    with BuildSketch(Plane.XY.offset(FILL_START)):
        with Locations((-15, -5)):
            Circle(FILL_ORIGINAL_SERVO_HOLES_PROFILE_R)
        with Locations((-15, 5)):
            Circle(FILL_ORIGINAL_SERVO_HOLES_PROFILE_R)
        with Locations((35, -5)):
            Circle(FILL_ORIGINAL_SERVO_HOLES_PROFILE_R)
        with Locations((35, 5)):
            Circle(FILL_ORIGINAL_SERVO_HOLES_PROFILE_R)
    extrude(amount=FILL_ORIGINAL_SERVO_HOLES_DEPTH)

    # Servo mounting holes raised 4.10 mm profile → Servo mounting holes raised 4.10 mm (cut)
    with BuildSketch(Plane.XY.offset(SERVO_START)):
        with Locations(Location((-15, -9.1, 0), (0, 0, 180))):
            Circle(SERVO_MOUNTING_HOLES_RAISED_4_10_MM_PROF_R)
        with Locations(Location((-15, 0.9, 0), (0, 0, 180))):
            Circle(SERVO_MOUNTING_HOLES_RAISED_4_10_MM_PROF_R)
        with Locations(Location((35, -9.1, 0), (0, 0, 180))):
            Circle(SERVO_MOUNTING_HOLES_RAISED_4_10_MM_PROF_R)
        with Locations(Location((35, 0.9, 0), (0, 0, 180))):
            Circle(SERVO_MOUNTING_HOLES_RAISED_4_10_MM_PROF_R)
    extrude(amount=SERVO_MOUNTING_HOLES_RAISED_4_10_MM_DEPTH, mode=Mode.SUBTRACT)

    # 草图9 → 凸台-拉伸5 (add)
    with BuildSketch(Plane(origin=(41, 0, 0), x_dir=(0, 0, -1), z_dir=(1, 0, 0))):
        Polygon((-24.5, 29), (6.753905297, 29), (-20, -12.1), align=None)
    extrude(amount=-EXTRUDE_5_DEPTH)


solid = part.part
